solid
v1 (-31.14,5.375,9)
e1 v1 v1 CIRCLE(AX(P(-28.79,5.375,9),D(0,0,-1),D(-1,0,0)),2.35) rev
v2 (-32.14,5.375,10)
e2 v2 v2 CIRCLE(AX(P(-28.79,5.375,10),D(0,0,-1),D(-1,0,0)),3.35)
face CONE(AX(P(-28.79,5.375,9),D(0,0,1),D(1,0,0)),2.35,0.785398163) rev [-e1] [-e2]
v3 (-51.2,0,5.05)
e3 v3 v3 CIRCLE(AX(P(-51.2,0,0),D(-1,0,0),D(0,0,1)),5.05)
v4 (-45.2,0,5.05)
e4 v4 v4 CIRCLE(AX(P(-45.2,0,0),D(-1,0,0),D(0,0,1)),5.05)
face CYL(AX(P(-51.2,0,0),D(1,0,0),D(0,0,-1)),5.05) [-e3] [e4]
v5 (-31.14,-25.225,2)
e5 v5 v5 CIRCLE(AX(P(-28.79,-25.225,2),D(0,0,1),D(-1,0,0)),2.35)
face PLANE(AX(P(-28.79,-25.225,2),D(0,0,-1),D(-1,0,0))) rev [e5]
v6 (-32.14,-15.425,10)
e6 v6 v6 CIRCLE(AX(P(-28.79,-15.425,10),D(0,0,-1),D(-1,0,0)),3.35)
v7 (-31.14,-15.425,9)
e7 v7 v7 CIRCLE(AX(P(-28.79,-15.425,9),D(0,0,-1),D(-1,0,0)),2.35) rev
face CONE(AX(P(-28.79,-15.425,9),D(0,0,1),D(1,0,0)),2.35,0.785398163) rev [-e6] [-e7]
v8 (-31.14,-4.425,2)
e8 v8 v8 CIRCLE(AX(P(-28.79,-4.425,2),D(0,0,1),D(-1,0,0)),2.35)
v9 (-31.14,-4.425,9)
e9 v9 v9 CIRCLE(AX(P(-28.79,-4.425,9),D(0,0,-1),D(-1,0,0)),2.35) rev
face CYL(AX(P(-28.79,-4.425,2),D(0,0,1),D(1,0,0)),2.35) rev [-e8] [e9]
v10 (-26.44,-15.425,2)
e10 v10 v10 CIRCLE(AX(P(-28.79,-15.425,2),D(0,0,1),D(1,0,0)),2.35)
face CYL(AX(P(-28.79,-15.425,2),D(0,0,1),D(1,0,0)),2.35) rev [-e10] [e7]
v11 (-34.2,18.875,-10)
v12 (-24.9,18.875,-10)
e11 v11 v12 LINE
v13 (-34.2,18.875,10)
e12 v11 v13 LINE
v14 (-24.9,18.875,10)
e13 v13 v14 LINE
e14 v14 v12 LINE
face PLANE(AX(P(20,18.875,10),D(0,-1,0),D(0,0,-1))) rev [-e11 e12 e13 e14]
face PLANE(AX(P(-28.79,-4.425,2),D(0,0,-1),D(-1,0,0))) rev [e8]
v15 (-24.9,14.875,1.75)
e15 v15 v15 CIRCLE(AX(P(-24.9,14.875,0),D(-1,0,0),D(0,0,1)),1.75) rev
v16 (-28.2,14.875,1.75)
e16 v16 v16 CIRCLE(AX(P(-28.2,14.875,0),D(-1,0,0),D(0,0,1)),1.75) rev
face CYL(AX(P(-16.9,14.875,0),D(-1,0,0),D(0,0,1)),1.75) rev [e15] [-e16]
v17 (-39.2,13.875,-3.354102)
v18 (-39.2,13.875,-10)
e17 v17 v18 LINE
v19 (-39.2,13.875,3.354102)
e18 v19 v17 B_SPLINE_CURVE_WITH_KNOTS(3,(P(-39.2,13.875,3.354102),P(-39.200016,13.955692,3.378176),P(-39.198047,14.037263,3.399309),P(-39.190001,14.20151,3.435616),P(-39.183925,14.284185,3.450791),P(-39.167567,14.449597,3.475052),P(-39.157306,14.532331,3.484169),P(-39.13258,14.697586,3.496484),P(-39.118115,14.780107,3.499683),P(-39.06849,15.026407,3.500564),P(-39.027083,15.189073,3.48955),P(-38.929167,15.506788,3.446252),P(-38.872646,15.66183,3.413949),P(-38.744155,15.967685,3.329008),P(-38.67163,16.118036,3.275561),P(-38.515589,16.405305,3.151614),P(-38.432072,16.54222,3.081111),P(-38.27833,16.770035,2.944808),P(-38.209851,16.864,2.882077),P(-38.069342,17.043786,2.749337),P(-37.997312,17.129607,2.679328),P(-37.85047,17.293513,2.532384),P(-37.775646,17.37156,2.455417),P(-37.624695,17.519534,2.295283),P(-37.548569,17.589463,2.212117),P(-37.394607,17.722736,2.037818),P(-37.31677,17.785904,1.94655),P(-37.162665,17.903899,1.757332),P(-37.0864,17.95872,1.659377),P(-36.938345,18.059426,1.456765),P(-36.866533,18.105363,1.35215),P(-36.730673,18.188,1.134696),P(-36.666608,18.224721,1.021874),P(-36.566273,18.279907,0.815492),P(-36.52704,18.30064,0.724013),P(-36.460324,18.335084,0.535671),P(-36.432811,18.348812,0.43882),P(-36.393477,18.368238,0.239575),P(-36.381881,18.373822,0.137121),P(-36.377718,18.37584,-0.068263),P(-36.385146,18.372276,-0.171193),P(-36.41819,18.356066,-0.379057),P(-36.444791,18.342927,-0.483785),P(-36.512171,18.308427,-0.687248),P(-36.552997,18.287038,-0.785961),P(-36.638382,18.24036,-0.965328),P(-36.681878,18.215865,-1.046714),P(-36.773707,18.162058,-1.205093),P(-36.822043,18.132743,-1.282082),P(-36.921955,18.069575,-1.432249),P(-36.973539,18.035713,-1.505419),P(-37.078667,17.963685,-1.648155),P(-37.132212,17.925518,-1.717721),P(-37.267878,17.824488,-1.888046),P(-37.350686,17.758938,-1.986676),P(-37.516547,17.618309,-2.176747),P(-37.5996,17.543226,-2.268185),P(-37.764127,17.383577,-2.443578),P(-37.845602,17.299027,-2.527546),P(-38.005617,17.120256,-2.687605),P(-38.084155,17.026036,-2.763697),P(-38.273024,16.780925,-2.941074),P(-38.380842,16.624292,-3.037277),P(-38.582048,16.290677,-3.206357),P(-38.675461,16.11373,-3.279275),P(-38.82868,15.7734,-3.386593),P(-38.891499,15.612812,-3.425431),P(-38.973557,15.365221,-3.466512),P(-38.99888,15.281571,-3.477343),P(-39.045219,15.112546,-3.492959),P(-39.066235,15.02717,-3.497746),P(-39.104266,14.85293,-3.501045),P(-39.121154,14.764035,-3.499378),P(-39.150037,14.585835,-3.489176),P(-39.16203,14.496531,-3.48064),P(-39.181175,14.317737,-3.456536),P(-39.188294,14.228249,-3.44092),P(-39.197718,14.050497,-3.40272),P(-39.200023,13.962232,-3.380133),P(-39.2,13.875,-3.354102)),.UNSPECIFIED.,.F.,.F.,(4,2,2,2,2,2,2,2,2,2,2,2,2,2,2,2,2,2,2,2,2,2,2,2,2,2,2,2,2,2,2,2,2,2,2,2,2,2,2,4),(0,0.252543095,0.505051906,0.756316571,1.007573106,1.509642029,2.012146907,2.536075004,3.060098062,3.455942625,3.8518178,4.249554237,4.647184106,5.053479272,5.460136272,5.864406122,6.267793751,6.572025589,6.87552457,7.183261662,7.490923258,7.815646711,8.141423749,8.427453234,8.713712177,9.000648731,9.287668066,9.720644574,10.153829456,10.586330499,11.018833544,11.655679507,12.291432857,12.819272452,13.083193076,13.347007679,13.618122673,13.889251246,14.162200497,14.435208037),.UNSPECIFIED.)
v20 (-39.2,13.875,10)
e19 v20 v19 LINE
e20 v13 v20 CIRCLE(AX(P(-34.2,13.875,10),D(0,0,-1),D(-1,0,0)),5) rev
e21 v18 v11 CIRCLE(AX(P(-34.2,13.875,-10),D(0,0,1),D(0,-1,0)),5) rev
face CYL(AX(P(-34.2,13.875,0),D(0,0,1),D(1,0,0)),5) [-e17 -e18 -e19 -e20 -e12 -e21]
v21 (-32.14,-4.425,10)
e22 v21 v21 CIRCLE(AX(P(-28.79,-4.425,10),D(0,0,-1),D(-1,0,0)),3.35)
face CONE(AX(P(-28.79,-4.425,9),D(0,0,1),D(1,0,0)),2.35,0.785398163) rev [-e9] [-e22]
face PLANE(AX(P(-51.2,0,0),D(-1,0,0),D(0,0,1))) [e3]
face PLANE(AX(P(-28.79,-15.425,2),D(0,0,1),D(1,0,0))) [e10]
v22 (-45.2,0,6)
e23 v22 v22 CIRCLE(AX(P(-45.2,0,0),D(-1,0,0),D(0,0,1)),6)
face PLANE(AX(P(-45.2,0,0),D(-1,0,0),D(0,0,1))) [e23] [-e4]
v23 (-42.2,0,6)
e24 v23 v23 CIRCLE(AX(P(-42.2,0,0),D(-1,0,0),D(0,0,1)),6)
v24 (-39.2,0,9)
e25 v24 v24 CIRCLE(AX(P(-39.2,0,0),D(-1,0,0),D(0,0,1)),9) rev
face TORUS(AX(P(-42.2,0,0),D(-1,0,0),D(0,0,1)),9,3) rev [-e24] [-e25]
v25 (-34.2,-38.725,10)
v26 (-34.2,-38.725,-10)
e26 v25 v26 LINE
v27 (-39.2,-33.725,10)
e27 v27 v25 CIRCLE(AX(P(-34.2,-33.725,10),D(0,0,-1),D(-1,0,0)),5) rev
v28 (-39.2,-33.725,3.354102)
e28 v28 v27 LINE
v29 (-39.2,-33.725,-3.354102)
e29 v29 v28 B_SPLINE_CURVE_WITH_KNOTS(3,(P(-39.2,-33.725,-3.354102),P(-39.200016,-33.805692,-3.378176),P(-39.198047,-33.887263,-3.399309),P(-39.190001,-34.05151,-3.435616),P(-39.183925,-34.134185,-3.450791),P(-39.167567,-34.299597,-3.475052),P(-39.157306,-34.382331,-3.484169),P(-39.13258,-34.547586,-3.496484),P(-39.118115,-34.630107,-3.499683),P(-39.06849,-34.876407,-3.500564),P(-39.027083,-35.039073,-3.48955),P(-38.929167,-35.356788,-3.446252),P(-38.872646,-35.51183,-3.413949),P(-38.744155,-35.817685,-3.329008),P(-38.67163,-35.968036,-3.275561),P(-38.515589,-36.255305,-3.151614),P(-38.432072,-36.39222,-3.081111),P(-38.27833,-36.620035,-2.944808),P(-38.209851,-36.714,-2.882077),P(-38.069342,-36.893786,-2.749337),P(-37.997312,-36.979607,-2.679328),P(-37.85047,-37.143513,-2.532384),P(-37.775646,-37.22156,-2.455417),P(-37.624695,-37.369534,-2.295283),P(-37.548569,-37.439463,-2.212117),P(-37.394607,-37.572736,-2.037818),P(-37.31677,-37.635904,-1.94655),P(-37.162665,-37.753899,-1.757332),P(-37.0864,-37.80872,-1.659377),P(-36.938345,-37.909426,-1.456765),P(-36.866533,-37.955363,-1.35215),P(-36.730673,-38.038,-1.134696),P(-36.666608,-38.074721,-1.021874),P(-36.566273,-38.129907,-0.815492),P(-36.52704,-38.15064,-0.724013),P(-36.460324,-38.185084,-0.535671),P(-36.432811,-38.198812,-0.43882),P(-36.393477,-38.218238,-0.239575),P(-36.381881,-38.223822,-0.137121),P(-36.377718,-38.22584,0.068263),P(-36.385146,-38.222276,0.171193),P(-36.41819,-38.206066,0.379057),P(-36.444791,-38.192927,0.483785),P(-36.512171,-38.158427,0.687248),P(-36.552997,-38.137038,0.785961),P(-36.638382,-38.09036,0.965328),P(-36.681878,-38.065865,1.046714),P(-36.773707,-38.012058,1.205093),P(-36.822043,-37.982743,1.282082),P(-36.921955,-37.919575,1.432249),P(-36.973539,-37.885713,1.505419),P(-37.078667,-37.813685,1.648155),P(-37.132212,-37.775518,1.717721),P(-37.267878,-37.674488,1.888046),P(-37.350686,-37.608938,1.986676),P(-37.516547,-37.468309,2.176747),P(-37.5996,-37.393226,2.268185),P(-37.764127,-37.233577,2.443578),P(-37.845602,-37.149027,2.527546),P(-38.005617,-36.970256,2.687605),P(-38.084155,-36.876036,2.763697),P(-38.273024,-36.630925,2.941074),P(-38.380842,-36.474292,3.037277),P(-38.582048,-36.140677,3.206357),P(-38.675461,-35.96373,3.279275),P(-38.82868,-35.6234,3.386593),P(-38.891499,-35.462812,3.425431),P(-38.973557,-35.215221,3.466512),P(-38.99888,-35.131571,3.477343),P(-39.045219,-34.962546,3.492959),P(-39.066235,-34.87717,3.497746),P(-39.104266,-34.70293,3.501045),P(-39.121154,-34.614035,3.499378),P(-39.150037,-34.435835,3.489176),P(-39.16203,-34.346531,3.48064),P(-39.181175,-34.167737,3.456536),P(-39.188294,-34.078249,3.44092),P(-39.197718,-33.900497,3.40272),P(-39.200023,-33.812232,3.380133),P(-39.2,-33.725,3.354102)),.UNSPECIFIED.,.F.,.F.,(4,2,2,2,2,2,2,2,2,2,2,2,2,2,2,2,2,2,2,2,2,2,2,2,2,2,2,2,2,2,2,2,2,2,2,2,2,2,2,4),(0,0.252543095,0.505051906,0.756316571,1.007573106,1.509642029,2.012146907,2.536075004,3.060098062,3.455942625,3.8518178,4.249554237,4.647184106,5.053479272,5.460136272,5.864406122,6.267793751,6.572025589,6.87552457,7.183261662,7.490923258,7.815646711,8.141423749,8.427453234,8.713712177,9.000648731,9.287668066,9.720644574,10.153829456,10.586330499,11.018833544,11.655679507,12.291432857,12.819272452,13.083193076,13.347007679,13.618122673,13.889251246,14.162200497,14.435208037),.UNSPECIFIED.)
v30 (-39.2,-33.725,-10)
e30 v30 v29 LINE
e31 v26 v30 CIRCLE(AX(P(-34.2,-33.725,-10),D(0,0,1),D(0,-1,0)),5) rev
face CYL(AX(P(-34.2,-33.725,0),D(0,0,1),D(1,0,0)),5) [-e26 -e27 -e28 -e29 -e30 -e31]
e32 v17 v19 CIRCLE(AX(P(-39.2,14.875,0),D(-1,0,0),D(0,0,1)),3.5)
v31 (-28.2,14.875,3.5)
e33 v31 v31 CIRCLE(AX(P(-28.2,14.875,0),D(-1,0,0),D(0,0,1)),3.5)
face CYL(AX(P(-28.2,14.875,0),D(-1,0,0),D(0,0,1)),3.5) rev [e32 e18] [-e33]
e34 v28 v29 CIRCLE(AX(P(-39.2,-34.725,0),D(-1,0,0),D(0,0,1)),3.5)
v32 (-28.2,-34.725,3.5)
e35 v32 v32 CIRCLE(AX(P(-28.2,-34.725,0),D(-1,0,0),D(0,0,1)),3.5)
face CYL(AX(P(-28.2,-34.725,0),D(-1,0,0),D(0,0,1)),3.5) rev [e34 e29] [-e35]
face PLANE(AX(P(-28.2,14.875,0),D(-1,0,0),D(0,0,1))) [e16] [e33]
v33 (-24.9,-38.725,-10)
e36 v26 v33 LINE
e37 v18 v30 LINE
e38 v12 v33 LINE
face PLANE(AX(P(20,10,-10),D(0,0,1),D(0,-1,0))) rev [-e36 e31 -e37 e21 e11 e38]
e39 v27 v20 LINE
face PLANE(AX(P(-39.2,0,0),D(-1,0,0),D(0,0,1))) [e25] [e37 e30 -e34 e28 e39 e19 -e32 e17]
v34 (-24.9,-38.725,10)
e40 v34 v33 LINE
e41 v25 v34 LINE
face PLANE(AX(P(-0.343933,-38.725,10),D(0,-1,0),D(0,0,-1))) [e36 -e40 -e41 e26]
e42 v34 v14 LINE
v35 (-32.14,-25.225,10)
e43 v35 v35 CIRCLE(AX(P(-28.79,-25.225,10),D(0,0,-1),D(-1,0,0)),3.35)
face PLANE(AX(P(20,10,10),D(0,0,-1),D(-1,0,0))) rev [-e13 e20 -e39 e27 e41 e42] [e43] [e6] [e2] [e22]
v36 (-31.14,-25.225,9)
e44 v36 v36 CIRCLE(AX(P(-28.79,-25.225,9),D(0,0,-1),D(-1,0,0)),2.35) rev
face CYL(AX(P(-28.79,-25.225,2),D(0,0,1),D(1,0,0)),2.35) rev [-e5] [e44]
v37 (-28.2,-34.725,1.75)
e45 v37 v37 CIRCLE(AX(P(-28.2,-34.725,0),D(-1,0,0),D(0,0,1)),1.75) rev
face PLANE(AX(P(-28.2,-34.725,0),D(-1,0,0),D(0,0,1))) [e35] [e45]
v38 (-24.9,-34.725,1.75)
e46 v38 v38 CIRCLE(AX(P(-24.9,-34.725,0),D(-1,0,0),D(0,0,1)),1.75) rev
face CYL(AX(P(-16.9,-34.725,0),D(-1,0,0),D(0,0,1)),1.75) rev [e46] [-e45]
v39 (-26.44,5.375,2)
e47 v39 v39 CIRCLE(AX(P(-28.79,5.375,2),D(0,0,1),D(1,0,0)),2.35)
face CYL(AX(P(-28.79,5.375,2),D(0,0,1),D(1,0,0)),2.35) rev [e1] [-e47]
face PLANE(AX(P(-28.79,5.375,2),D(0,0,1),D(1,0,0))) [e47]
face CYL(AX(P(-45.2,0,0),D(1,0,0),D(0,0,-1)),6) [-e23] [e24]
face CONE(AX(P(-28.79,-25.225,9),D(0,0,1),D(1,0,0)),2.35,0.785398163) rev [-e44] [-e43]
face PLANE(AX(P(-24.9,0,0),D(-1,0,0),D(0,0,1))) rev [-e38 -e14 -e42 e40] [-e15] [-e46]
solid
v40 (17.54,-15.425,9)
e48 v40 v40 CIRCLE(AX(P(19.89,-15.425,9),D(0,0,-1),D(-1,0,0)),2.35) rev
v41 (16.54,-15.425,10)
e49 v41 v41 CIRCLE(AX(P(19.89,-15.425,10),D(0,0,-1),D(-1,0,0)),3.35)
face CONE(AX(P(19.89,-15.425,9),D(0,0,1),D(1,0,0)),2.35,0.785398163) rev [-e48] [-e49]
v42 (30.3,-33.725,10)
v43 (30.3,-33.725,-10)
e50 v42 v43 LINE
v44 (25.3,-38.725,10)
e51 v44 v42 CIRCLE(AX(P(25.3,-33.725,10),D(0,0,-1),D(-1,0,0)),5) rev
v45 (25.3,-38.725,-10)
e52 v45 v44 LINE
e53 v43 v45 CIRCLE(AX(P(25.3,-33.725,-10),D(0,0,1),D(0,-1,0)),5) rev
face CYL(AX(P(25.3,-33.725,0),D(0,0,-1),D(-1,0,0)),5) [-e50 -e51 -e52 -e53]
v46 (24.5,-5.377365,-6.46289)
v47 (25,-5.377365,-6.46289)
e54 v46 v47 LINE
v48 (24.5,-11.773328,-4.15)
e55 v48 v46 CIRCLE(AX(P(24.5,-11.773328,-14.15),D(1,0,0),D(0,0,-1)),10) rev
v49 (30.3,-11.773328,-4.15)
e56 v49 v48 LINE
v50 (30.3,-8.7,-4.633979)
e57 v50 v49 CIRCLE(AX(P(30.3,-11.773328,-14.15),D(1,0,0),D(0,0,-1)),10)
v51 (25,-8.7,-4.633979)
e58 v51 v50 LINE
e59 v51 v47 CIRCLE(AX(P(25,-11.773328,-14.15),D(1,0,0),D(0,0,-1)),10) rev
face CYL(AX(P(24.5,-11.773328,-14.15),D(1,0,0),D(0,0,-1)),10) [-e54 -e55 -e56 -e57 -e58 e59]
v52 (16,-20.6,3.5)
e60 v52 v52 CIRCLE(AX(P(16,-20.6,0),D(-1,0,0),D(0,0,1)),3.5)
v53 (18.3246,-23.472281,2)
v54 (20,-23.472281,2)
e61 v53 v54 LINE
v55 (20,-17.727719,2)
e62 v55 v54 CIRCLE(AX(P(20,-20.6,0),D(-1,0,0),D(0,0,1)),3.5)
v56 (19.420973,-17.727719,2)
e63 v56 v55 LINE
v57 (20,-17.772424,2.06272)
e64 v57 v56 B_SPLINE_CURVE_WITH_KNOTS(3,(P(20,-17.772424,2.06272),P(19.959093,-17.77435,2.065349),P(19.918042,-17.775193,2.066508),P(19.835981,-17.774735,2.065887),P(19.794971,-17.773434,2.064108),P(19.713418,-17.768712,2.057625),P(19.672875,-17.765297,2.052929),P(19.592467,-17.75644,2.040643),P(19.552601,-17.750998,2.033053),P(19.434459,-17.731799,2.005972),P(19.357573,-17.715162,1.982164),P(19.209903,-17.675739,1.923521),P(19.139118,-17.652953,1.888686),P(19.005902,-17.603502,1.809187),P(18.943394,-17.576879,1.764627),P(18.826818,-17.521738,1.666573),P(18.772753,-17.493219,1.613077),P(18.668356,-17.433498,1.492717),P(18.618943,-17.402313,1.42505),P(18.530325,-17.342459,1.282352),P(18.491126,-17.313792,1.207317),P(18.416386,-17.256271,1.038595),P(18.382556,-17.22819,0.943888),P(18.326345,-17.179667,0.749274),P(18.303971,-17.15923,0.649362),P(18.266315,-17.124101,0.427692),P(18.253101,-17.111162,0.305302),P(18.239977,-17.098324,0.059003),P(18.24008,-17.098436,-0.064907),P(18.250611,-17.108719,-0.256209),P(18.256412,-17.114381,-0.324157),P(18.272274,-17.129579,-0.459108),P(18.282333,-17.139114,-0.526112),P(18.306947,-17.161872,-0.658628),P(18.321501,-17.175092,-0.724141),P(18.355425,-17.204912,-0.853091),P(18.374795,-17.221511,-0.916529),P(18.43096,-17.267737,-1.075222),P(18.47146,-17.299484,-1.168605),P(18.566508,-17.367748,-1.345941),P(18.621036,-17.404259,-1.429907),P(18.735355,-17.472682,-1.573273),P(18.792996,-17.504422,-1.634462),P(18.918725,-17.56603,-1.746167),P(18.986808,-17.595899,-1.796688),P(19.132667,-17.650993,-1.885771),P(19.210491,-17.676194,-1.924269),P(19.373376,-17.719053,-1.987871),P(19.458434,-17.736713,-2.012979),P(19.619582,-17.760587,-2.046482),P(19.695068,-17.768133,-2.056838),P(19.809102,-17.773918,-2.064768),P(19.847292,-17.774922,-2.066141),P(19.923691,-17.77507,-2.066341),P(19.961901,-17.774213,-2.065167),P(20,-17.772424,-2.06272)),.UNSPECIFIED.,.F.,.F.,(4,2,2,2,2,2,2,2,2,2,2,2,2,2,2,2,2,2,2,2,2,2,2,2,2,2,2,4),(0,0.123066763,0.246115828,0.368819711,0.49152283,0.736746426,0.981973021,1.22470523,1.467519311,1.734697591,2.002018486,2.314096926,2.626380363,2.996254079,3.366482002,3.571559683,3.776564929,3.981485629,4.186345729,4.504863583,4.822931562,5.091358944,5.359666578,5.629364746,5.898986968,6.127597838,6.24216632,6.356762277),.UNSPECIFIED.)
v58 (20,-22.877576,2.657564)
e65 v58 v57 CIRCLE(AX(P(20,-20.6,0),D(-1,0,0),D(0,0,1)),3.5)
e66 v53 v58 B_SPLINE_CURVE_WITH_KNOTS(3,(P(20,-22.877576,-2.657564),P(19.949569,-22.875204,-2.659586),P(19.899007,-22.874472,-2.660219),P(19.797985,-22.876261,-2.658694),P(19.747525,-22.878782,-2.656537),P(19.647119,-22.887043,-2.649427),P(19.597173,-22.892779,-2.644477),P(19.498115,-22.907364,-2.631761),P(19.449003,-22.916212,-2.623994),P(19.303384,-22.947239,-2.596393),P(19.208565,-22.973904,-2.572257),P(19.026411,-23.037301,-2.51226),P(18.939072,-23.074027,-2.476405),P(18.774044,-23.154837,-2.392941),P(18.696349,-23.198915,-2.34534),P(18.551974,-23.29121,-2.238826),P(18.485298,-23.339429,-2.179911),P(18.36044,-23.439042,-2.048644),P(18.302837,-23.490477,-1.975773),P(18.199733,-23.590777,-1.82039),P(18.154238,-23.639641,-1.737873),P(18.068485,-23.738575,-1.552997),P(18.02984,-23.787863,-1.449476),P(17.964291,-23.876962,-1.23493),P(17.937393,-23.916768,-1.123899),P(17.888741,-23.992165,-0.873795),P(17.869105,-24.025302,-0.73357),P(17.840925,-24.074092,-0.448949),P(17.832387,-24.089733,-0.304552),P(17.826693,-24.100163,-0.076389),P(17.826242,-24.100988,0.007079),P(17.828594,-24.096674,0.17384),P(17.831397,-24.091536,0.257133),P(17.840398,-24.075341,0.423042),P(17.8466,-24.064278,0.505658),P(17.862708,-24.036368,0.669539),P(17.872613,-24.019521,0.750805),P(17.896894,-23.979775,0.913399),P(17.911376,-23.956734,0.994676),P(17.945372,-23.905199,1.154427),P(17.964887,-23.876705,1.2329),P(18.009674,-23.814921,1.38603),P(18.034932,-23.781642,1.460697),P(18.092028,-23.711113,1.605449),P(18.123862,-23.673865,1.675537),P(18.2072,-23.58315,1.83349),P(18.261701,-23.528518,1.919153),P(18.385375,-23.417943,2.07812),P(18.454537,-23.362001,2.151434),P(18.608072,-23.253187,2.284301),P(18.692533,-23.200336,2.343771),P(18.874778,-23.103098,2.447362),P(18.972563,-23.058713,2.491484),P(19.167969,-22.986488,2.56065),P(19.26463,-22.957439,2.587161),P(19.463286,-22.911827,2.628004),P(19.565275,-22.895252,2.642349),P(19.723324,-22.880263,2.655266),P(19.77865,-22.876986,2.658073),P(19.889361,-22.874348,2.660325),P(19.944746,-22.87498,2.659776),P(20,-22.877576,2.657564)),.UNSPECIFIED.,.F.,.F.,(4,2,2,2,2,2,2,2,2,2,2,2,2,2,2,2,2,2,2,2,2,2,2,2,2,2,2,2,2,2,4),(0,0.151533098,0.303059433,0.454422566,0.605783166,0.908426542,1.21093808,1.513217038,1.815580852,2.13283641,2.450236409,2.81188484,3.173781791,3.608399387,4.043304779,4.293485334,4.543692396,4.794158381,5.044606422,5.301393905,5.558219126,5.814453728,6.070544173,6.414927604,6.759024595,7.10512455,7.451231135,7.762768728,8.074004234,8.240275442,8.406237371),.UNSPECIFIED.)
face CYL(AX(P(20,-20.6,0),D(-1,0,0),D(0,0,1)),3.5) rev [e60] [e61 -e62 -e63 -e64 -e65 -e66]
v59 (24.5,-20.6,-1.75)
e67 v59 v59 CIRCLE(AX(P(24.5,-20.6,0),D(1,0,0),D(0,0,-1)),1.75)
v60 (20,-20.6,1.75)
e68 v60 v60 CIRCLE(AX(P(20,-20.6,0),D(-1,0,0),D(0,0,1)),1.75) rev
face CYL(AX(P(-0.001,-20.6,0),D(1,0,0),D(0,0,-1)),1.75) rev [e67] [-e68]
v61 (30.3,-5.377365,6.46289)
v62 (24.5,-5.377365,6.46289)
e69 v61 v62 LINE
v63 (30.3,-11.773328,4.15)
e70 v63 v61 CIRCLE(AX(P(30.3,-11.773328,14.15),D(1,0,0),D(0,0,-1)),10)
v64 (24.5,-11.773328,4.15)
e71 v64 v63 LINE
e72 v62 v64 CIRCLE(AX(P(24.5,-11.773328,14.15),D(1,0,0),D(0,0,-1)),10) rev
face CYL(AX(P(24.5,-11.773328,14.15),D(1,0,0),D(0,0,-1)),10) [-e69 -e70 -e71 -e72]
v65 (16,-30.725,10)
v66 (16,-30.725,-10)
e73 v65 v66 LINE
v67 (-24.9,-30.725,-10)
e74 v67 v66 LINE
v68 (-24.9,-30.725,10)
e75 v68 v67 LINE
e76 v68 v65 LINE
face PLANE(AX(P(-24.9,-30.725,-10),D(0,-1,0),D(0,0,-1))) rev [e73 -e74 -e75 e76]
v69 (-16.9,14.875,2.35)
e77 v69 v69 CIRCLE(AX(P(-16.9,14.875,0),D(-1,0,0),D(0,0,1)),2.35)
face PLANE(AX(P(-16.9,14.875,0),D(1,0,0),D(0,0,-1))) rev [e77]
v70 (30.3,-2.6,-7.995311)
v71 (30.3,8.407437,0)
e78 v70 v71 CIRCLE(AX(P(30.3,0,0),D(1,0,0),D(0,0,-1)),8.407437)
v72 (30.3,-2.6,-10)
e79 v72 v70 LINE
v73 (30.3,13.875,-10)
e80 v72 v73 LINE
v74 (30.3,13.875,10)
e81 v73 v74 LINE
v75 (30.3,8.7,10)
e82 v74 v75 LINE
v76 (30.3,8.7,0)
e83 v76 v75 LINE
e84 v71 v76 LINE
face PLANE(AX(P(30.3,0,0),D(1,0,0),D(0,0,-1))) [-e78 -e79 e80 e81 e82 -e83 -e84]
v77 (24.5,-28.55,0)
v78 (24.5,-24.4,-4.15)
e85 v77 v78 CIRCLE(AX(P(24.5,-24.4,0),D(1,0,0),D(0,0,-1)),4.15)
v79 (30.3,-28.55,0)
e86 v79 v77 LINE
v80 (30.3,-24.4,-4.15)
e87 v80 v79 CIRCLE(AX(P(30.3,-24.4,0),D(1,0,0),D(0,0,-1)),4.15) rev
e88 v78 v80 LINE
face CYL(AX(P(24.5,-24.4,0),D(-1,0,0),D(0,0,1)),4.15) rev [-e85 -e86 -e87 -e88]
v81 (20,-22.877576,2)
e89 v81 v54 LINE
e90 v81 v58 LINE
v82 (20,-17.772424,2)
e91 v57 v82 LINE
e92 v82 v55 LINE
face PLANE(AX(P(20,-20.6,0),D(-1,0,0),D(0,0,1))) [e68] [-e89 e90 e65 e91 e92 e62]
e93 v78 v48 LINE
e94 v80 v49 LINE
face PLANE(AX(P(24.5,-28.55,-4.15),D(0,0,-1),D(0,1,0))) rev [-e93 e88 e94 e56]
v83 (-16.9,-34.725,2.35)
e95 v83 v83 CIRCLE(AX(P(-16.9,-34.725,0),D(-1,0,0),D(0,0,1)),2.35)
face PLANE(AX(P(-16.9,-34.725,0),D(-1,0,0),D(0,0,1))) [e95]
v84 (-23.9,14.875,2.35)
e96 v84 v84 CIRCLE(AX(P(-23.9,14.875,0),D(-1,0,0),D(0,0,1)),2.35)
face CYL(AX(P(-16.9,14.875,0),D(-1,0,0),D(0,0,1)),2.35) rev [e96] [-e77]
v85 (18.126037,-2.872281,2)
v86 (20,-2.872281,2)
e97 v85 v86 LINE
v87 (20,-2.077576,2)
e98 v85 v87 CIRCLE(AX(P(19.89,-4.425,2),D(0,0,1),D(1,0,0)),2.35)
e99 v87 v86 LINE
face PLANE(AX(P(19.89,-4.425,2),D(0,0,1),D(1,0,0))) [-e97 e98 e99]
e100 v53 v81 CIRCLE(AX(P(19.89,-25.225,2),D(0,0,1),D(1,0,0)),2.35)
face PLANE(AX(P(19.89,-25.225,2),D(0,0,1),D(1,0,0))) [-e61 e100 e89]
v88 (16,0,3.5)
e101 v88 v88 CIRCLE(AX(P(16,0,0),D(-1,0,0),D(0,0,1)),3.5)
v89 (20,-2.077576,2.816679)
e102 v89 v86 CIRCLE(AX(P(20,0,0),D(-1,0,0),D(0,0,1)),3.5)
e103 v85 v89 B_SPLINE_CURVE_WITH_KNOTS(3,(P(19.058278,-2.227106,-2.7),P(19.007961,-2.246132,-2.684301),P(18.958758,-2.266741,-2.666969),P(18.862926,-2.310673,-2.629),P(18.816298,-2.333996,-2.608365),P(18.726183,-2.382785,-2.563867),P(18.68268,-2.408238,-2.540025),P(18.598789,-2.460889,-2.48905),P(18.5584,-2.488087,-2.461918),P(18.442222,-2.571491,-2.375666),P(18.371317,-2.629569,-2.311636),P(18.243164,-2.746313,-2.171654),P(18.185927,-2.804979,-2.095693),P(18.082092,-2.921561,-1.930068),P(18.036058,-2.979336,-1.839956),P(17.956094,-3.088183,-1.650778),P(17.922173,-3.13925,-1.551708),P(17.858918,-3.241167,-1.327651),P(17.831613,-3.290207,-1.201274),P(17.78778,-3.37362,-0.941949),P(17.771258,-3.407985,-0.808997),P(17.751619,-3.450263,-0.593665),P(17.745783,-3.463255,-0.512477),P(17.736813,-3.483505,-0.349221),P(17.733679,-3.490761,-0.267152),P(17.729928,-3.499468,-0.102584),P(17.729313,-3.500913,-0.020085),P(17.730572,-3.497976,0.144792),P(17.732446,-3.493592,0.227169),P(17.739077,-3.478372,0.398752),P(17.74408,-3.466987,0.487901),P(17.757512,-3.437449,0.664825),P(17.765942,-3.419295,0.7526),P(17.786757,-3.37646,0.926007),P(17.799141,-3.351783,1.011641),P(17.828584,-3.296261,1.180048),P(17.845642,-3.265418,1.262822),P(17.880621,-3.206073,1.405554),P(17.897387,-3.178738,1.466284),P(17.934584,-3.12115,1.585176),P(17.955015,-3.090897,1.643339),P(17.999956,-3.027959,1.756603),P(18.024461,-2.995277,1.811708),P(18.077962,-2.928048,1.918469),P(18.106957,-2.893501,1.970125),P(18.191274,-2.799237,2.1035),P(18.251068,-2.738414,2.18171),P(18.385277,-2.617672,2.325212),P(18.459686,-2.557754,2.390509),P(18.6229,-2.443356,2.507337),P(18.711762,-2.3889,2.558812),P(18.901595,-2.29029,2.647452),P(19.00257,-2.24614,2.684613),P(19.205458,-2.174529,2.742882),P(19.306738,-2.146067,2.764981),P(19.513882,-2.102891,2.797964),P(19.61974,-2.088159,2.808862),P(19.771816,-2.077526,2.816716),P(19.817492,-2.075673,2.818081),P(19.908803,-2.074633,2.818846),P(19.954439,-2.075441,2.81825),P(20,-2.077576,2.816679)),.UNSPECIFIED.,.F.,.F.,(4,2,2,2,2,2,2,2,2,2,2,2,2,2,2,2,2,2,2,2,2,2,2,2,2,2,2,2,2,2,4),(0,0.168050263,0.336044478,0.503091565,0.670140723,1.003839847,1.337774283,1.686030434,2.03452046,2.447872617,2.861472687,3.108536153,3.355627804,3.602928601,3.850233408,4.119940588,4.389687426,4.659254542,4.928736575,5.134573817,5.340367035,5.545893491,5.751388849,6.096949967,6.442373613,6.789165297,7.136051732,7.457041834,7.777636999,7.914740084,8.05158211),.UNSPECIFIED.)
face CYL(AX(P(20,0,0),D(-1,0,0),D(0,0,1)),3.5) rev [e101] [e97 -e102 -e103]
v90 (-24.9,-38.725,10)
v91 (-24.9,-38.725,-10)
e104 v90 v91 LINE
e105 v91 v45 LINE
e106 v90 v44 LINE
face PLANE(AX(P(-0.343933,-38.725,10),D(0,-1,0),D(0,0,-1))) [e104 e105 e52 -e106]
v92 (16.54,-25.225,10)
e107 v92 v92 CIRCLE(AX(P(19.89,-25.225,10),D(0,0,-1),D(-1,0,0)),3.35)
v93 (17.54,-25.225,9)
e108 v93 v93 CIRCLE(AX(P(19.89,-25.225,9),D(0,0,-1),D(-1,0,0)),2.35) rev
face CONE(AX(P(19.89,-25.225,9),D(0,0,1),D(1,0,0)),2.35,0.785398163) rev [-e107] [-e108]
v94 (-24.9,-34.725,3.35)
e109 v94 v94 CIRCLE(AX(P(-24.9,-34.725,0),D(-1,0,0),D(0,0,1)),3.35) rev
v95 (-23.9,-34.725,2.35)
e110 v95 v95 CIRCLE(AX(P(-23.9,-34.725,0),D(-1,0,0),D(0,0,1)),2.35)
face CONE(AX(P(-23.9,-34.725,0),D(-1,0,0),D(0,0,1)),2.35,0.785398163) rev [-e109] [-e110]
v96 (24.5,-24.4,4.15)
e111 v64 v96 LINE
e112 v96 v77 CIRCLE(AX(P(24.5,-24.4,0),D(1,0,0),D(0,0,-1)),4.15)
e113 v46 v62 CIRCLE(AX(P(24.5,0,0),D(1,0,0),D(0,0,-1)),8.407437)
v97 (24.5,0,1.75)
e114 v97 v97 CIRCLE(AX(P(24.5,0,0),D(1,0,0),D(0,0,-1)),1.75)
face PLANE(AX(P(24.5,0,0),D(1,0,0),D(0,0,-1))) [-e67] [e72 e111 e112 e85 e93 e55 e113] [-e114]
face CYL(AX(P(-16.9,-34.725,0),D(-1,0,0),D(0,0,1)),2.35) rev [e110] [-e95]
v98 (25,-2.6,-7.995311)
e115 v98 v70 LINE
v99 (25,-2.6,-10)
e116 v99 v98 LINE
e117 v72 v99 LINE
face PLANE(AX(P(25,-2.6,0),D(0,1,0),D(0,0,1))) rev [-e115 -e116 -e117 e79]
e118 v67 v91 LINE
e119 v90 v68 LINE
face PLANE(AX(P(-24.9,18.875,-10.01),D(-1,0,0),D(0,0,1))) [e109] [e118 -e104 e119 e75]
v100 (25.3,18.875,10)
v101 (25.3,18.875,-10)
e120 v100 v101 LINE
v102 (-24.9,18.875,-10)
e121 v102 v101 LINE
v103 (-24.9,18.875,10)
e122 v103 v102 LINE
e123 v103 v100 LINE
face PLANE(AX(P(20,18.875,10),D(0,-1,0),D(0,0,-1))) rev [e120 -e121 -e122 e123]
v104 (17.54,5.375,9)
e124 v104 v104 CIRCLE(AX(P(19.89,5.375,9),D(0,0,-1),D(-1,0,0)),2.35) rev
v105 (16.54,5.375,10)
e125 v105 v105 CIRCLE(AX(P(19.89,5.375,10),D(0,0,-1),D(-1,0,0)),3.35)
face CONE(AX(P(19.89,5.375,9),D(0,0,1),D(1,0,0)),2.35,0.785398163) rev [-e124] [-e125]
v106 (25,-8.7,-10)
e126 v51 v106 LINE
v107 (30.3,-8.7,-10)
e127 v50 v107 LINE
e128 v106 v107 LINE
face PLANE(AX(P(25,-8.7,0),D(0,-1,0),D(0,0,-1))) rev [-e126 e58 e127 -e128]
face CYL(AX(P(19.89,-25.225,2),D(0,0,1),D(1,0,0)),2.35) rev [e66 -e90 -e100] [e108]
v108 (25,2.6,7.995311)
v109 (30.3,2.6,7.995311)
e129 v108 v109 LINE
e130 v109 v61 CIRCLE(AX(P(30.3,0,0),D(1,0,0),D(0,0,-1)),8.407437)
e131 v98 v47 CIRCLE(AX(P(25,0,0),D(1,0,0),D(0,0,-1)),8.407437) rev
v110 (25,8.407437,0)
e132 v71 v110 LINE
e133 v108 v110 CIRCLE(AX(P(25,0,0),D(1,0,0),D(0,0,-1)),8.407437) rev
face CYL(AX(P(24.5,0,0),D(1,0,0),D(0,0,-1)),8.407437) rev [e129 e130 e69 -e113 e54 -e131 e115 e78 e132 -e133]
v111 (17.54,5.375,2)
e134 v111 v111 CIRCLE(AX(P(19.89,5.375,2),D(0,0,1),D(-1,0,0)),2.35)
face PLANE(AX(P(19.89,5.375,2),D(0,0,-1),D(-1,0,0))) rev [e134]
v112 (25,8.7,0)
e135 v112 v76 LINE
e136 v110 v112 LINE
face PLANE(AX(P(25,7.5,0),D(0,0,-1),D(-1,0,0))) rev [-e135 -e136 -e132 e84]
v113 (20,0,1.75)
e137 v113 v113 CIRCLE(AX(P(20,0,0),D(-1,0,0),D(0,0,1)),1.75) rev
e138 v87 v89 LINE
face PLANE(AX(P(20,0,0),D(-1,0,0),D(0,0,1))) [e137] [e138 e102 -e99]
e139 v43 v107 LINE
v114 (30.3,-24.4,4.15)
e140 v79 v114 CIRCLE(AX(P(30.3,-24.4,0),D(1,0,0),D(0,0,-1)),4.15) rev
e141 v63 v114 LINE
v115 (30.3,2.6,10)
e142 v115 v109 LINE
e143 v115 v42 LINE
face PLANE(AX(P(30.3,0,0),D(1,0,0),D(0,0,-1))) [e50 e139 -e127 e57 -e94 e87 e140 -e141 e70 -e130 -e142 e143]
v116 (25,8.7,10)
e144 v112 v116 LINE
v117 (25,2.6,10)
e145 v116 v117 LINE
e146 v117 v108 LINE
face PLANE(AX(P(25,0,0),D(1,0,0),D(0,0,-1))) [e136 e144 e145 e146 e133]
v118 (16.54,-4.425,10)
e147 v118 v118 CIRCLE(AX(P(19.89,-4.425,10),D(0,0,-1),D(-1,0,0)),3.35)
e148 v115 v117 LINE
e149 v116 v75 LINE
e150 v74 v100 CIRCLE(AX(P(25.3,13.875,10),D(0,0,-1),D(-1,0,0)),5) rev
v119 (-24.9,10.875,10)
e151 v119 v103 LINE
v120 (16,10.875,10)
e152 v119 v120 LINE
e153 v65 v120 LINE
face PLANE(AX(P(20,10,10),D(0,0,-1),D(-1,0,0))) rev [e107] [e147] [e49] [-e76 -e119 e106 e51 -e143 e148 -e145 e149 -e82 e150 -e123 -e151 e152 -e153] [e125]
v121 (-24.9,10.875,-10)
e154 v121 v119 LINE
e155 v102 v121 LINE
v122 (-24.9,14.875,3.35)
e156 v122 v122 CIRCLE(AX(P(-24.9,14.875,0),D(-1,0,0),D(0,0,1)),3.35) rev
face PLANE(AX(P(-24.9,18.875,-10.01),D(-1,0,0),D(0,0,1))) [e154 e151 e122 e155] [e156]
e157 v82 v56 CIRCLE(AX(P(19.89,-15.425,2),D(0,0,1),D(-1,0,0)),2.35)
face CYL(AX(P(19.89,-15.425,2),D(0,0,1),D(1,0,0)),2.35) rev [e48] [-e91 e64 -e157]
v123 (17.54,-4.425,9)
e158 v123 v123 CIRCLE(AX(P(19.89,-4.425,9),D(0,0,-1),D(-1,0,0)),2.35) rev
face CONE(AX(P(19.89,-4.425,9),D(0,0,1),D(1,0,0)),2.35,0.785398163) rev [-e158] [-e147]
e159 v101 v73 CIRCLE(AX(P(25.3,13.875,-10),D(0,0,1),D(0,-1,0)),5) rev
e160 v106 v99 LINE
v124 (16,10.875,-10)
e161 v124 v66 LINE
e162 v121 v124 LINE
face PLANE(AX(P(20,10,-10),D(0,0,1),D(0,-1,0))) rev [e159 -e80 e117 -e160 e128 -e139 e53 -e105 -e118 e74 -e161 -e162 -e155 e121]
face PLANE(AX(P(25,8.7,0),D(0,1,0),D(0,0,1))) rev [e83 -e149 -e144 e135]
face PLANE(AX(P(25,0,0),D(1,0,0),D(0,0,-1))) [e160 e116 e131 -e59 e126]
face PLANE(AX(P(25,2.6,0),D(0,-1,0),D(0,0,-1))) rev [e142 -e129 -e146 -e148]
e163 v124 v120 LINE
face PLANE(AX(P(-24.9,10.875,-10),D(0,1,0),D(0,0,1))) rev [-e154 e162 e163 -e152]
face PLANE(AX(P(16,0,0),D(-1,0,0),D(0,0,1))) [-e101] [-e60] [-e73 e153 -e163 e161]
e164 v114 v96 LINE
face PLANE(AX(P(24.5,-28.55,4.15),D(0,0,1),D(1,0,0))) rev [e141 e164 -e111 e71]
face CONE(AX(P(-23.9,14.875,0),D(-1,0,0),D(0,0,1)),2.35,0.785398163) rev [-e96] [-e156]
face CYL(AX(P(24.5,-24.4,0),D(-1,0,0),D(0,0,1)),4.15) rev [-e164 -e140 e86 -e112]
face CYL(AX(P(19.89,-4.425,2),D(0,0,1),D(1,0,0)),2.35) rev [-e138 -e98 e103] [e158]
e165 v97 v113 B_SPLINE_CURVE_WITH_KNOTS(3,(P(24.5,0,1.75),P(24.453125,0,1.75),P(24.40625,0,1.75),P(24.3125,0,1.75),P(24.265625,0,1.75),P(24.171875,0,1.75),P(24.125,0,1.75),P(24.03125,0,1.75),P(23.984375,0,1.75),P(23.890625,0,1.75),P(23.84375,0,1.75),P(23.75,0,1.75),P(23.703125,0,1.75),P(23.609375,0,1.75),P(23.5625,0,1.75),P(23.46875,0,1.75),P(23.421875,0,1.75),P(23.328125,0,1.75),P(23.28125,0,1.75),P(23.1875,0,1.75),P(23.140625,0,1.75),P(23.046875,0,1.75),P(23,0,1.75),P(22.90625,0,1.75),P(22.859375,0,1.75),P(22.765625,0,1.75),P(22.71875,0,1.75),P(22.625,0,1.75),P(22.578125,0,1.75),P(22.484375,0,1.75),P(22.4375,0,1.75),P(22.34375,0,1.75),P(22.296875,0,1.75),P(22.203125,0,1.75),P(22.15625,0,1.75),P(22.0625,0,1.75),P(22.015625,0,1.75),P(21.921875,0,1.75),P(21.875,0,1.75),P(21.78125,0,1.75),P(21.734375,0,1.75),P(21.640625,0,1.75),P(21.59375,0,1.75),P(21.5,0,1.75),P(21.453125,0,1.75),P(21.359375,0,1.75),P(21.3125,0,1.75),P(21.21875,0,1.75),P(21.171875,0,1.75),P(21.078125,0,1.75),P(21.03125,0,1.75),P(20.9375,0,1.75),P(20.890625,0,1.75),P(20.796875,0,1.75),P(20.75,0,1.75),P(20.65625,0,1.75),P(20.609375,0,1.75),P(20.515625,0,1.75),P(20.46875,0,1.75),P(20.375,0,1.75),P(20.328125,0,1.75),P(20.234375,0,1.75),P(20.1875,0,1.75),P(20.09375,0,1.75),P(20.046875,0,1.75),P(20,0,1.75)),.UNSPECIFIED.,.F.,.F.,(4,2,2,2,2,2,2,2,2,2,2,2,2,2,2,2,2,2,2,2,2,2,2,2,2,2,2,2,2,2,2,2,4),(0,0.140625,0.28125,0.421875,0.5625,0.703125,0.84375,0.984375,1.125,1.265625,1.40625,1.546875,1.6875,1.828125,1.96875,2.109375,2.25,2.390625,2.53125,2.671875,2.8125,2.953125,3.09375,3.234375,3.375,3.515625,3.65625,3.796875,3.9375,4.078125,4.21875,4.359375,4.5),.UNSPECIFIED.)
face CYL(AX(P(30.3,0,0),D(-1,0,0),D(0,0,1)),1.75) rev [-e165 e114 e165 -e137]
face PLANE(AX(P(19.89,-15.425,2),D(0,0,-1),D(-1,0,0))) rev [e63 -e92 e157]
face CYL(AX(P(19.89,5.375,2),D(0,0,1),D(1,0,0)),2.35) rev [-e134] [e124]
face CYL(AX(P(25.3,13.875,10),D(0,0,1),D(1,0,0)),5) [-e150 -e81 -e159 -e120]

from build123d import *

# Parameters (mm, degrees)
SKETCH1_W              = 20
SKETCH1_H              = 20
BOSS_EXTRUDE1_DEPTH    = 20
SKETCH2_W              = 20
SKETCH2_H              = 70
BOSS_EXTRUDE2_DEPTH    = 10.3
CUT_EXTRUDE1_DEPTH     = 5.8
FILLET1_R              = 4.15
FILLET2_R              = 10
SKETCH5_R              = 1.75
CUT_EXTRUDE2_DEPTH     = 48.361271098
CUT_EXTRUDE3_REACH     = 45.878
SKETCH6_R              = 1.75
SKETCH13_W             = 20
SKETCH13_H             = 20
CUT_EXTRUDE9_DEPTH     = 20
CUT_EXTRUDE18_DEPTH    = 5.3
SKETCH32_W             = 20
SKETCH32_H             = 3.725
BOSS_EXTRUDE3_DEPTH    = 10.3
SKETCH31_W             = 20
SKETCH31_H             = 16.125
CUT_EXTRUDE19_DEPTH    = 42.300310229
SKETCH34_W             = 20
SKETCH34_H             = 57.6
SKETCH34_R             = 1.75
BOSS_EXTRUDE5_DEPTH    = 4
SKETCH35_W             = 20
SKETCH35_H             = 8
BOSS_EXTRUDE6_DEPTH    = 40.9
SKETCH37_W             = 20
SKETCH37_H             = 57.6
BOSS_EXTRUDE7_DEPTH    = 14.3
SKETCH38_R             = 2.35
CUT_EXTRUDE20_DEPTH    = 8
CHAMFER1_SIZE          = 1
SKETCH41_R             = 3.5
CUT_EXTRUDE23_DEPTH    = 4
SKETCH42_R             = 1.75
CUT_EXTRUDE24_DEPTH    = 22.3
SKETCH43_R             = 3.5
CUT_EXTRUDE25_DEPTH    = 11
FILLET3_R              = 5
SPLIT1_SURFACE_1_BACK  = 93.455
SPLIT1_SURFACE_1_DEPTH = 186.91
SPLIT1_SURFACE_2_BACK  = 93.455
SPLIT1_SURFACE_2_DEPTH = 186.91
SKETCH45_R             = 2.35
CUT_EXTRUDE26_DEPTH    = 8
CHAMFER2_SIZE          = 1
SKETCH46_R             = 5.05
BOSS_EXTRUDE8_DEPTH    = 12
SKETCH50_R             = 6
BOSS_EXTRUDE9_DEPTH    = 6
FILLET6_R              = 3


# Some blends are built 0.0001 mm under size
with BuildPart() as part:
    # Sketch1 → Boss-Extrude1 (new body)
    with BuildSketch(Plane(origin=(0, 0, 0), x_dir=(0, 0, -1), z_dir=(1, 0, 0))):
        Rectangle(SKETCH1_W, SKETCH1_H)
    extrude(amount=BOSS_EXTRUDE1_DEPTH)

    # Sketch2 → Boss-Extrude2 (add)
    with BuildSketch(Plane(origin=(20, 0, 0), x_dir=(0, 0, -1), z_dir=(1, 0, 0))):
        Rectangle(SKETCH2_W, SKETCH2_H)
    extrude(amount=BOSS_EXTRUDE2_DEPTH)

    # Sketch4 → Cut-Extrude1 (cut)
    with BuildSketch(Plane(origin=(30.3, 0, 0), x_dir=(0, 0, -1), z_dir=(1, 0, 0))):
        with BuildLine():
            Line((4.15, -28.55), (-4.15, -28.55))
            Line((-4.15, -28.55), (-4.15, -7.311805523))
            ThreePointArc((-4.15, -7.311805523), (0, 8.407437184), (4.15, -7.311805523))
            Line((4.15, -7.311805523), (4.15, -28.55))
        make_face()
    extrude(amount=-CUT_EXTRUDE1_DEPTH, mode=Mode.SUBTRACT)

    # Fillet1
    fillet1_edges = [part.edges().sort_by_distance(p)[0] for p in [
        (27.4, -28.55, 4.15),
        (27.4, -28.55, -4.15),
    ]]
    fillet(fillet1_edges, radius=FILLET1_R - 0.0001)  # a hair under: the kernel refuses the full size

    # Fillet2
    fillet2_edges = [part.edges().sort_by_distance(p)[0] for p in [
        (27.4, -7.311805523, 4.15),
        (27.4, -7.311805523, -4.15),
    ]]
    fillet(fillet2_edges, radius=FILLET2_R)

    # Sketch5 → Cut-Extrude2 (cut, through all)
    with BuildSketch(Plane.ZY):
        Circle(SKETCH5_R)
    extrude(amount=-CUT_EXTRUDE2_DEPTH, mode=Mode.SUBTRACT)

    # Sketch6 → Cut-Extrude3 (cut, up to next)
    with BuildSketch(Plane(origin=(24.5, 0, 0), x_dir=(0, 0, -1), z_dir=(1, 0, 0)), mode=Mode.PRIVATE) as cut_extrude3_sk1:
        with Locations((0, -20.6)):
            Circle(SKETCH6_R)
    cut_extrude3_tool1 = extrude(cut_extrude3_sk1.sketch, amount=-CUT_EXTRUDE3_REACH, mode=Mode.PRIVATE) & part.part
    add(cut_extrude3_tool1.solids().sort_by_distance((24.5, -20.6, 0))[0], mode=Mode.SUBTRACT)

    # Sketch13 → Cut-Extrude9 (cut)
    with BuildSketch(Plane.ZY):
        Rectangle(SKETCH13_W, SKETCH13_H)
    extrude(amount=-CUT_EXTRUDE9_DEPTH, mode=Mode.SUBTRACT)

    # Sketch29 → Cut-Extrude18 (cut)
    with BuildSketch(Plane(origin=(30.3, 0, 0), x_dir=(0, 0, -1), z_dir=(1, 0, 0))):
        Polygon((15.109449768, -8.7), (15.109449768, -2.6), (0, -2.6), (0, -3.8), (0, -7.5), (0, -8.7), align=None)
        Polygon((0, 2.6), (-15.109449768, 2.6), (-15.109449768, 8.7), (0, 8.7), (0, 7.5), (0, 3.8), align=None)
    extrude(amount=-CUT_EXTRUDE18_DEPTH, mode=Mode.SUBTRACT)

    # Sketch32 → Boss-Extrude3 (add)
    with BuildSketch(Plane(origin=(30.3, 0, 0), x_dir=(0, 0, -1), z_dir=(1, 0, 0))):
        with Locations((0, -36.8625)):
            Rectangle(SKETCH32_W, SKETCH32_H)
    extrude(amount=-BOSS_EXTRUDE3_DEPTH)

    # Sketch31 → Cut-Extrude19 (cut, through all)
    with BuildSketch(Plane(origin=(30.3, 0, 0), x_dir=(0, 0, -1), z_dir=(1, 0, 0))):
        with Locations((0, 26.9375)):
            Rectangle(SKETCH31_W, SKETCH31_H)
    extrude(amount=-CUT_EXTRUDE19_DEPTH, mode=Mode.SUBTRACT)

    # Sketch34 → Boss-Extrude5 (add)
    with BuildSketch(Plane.ZY.offset(-20)):
        with Locations((0, -9.925)):
            Rectangle(SKETCH34_W, SKETCH34_H)
        with Locations(Location((0, -20.6, 0), (0, 0, 180))):
            Circle(SKETCH34_R, mode=Mode.SUBTRACT)
        Circle(SKETCH34_R, mode=Mode.SUBTRACT)
    extrude(amount=BOSS_EXTRUDE5_DEPTH)

    # Sketch35 → Boss-Extrude6 (add)
    with BuildSketch(Plane.ZY.offset(-16)):
        with Locations((0, 14.875)):
            Rectangle(SKETCH35_W, SKETCH35_H)
        with Locations((0, -34.725)):
            Rectangle(SKETCH35_W, SKETCH35_H)
    extrude(amount=BOSS_EXTRUDE6_DEPTH)

    # Sketch37 → Boss-Extrude7 (add)
    with BuildSketch(Plane.ZY.offset(24.9)):
        with Locations((0, -9.925)):
            Rectangle(SKETCH37_W, SKETCH37_H)
    extrude(amount=BOSS_EXTRUDE7_DEPTH)

    # Sketch38 → Cut-Extrude20 (cut)
    with BuildSketch(Plane.XY.offset(10)):
        with Locations((-28.79, 5.375)):
            Circle(SKETCH38_R)
        with Locations(Location((-28.79, -4.425, 0), (0, 0, 180))):
            Circle(SKETCH38_R)
        with Locations(Location((-28.79, -25.225, 0), (0, 0, 180))):
            Circle(SKETCH38_R)
        with Locations((-28.79, -15.425)):
            Circle(SKETCH38_R)
        with Locations(Location((19.89, 5.375, 0), (0, 0, 180))):
            Circle(SKETCH38_R)
        with Locations((19.89, -4.425)):
            Circle(SKETCH38_R)
        with Locations(Location((19.89, -15.425, 0), (0, 0, 180))):
            Circle(SKETCH38_R)
        with Locations((19.89, -25.225)):
            Circle(SKETCH38_R)
    extrude(amount=-CUT_EXTRUDE20_DEPTH, mode=Mode.SUBTRACT)

    # Chamfer1
    chamfer1_edges = [part.edges().sort_by_distance(p)[0] for p in [
        (22.24, 5.375, 10),
        (-31.14, -15.425, 10),
        (-26.44, -25.225, 10),
        (-26.44, -4.425, 10),
        (17.54, -4.425, 10),
        (22.24, -15.425, 10),
        (17.54, -25.225, 10),
        (-31.14, 5.375, 10),
    ]]
    chamfer(chamfer1_edges, length=CHAMFER1_SIZE)

    # Sketch41 → Cut-Extrude23 (cut)
    with BuildSketch(Plane.ZY.offset(-16)):
        Circle(SKETCH41_R)
        with Locations((0, -20.6)):
            Circle(SKETCH41_R)
    extrude(amount=-CUT_EXTRUDE23_DEPTH, mode=Mode.SUBTRACT)

    # Sketch42 → Cut-Extrude24 (cut)
    with BuildSketch(Plane.ZY.offset(39.2)):
        with Locations((0, -34.725)):
            Circle(SKETCH42_R)
        with Locations(Location((0, 14.875, 0), (0, 0, 180))):
            Circle(SKETCH42_R)
    extrude(amount=-CUT_EXTRUDE24_DEPTH, mode=Mode.SUBTRACT)

    # Sketch43 → Cut-Extrude25 (cut)
    with BuildSketch(Plane.ZY.offset(39.2)):
        with Locations((0, 14.875)):
            Circle(SKETCH43_R)
        with Locations((0, -34.725)):
            Circle(SKETCH43_R)
    extrude(amount=-CUT_EXTRUDE25_DEPTH, mode=Mode.SUBTRACT)

    # Fillet3
    # the kernel refuses this fillet: 5 mm, written as the material it takes off along each edge
    with BuildSketch(Plane(origin=(30.3, -38.725, -22.5), x_dir=(-1, 0, 0), z_dir=(0, 0, 1)), Plane(origin=(-39.2, 18.875, -22.5), x_dir=(1, 0, 0), z_dir=(0, 0, 1))) as fillet3_piece_1:
        with BuildLine():
            CenterArc((FILLET3_R, -FILLET3_R), FILLET3_R, 90, 90)
            Line((0, -FILLET3_R), (0, 0))
            Line((0, 0), (FILLET3_R, 0))
        make_face()
    extrude(amount=45, mode=Mode.SUBTRACT)
    with BuildSketch(Plane(origin=(30.3, 18.875, -22.5), x_dir=(-1, 0, 0), z_dir=(0, 0, 1)), Plane(origin=(-39.2, -38.725, 22.5), x_dir=(0, 1, 0), z_dir=(0, 0, -1))) as fillet3_piece_2:
        with BuildLine():
            CenterArc((FILLET3_R, FILLET3_R), FILLET3_R, 180, 90)
            Line((0, FILLET3_R), (0, 0))
            Line((0, 0), (FILLET3_R, 0))
        make_face()
    extrude(amount=45, mode=Mode.SUBTRACT)


with BuildPart() as body_2:
    # Split1: the piece behind the surface
    add(part.part)
    # Split1 surface: a surface, the sketch's curves swept straight by 186.91 mm
    with BuildLine(Plane.XY.offset(10).offset(-SPLIT1_SURFACE_1_BACK), mode=Mode.PRIVATE) as split1_surface_1_path:
        Line((-24.9, 18.875), (-24.9, -38.725))
    split1_surface_1 = Shell.extrude(split1_surface_1_path.wire(), (0 * SPLIT1_SURFACE_1_DEPTH, 0 * SPLIT1_SURFACE_1_DEPTH, 1 * SPLIT1_SURFACE_1_DEPTH))
    split(bisect_by=split1_surface_1, keep=Keep.BOTTOM)

    # Sketch46 → Boss-Extrude8 (add)
    with BuildSketch(Plane.ZY.offset(39.2)):
        Circle(SKETCH46_R)
    extrude(amount=BOSS_EXTRUDE8_DEPTH)

    # Sketch50 → Boss-Extrude9 (add)
    with BuildSketch(Plane.ZY.offset(39.2)):
        Circle(SKETCH50_R)
    extrude(amount=BOSS_EXTRUDE9_DEPTH)

    # Fillet6
    fillet6_edges = [body_2.edges().sort_by_distance(p)[0] for p in [
        (-39.2, 0, -6),
    ]]
    fillet(fillet6_edges, radius=FILLET6_R)


with BuildPart() as part_1:
    add(part.part)

    # Split1: split by a surface, the side it looks to stays
    # Split1 surface: a surface, the sketch's curves swept straight by 186.91 mm
    with BuildLine(Plane.XY.offset(10).offset(-SPLIT1_SURFACE_2_BACK), mode=Mode.PRIVATE) as split1_surface_2_path:
        Line((-24.9, 18.875), (-24.9, -38.725))
    split1_surface_2 = Shell.extrude(split1_surface_2_path.wire(), (0 * SPLIT1_SURFACE_2_DEPTH, 0 * SPLIT1_SURFACE_2_DEPTH, 1 * SPLIT1_SURFACE_2_DEPTH))
    split(bisect_by=split1_surface_2, keep=Keep.TOP)

    # Sketch45 → Cut-Extrude26 (cut)
    with BuildSketch(Plane.ZY.offset(24.9)):
        with Locations((0, 14.875)):
            Circle(SKETCH45_R)
        with Locations((0, -34.725)):
            Circle(SKETCH45_R)
    extrude(amount=-CUT_EXTRUDE26_DEPTH, mode=Mode.SUBTRACT)

    # Chamfer2
    chamfer2_edges = [part_1.edges().sort_by_distance(p)[0] for p in [
        (-24.9, 14.875, -2.35),
        (-24.9, -34.725, -2.35),
    ]]
    chamfer(chamfer2_edges, length=CHAMFER2_SIZE)


solid = Compound([body_2.part, part_1.part])
